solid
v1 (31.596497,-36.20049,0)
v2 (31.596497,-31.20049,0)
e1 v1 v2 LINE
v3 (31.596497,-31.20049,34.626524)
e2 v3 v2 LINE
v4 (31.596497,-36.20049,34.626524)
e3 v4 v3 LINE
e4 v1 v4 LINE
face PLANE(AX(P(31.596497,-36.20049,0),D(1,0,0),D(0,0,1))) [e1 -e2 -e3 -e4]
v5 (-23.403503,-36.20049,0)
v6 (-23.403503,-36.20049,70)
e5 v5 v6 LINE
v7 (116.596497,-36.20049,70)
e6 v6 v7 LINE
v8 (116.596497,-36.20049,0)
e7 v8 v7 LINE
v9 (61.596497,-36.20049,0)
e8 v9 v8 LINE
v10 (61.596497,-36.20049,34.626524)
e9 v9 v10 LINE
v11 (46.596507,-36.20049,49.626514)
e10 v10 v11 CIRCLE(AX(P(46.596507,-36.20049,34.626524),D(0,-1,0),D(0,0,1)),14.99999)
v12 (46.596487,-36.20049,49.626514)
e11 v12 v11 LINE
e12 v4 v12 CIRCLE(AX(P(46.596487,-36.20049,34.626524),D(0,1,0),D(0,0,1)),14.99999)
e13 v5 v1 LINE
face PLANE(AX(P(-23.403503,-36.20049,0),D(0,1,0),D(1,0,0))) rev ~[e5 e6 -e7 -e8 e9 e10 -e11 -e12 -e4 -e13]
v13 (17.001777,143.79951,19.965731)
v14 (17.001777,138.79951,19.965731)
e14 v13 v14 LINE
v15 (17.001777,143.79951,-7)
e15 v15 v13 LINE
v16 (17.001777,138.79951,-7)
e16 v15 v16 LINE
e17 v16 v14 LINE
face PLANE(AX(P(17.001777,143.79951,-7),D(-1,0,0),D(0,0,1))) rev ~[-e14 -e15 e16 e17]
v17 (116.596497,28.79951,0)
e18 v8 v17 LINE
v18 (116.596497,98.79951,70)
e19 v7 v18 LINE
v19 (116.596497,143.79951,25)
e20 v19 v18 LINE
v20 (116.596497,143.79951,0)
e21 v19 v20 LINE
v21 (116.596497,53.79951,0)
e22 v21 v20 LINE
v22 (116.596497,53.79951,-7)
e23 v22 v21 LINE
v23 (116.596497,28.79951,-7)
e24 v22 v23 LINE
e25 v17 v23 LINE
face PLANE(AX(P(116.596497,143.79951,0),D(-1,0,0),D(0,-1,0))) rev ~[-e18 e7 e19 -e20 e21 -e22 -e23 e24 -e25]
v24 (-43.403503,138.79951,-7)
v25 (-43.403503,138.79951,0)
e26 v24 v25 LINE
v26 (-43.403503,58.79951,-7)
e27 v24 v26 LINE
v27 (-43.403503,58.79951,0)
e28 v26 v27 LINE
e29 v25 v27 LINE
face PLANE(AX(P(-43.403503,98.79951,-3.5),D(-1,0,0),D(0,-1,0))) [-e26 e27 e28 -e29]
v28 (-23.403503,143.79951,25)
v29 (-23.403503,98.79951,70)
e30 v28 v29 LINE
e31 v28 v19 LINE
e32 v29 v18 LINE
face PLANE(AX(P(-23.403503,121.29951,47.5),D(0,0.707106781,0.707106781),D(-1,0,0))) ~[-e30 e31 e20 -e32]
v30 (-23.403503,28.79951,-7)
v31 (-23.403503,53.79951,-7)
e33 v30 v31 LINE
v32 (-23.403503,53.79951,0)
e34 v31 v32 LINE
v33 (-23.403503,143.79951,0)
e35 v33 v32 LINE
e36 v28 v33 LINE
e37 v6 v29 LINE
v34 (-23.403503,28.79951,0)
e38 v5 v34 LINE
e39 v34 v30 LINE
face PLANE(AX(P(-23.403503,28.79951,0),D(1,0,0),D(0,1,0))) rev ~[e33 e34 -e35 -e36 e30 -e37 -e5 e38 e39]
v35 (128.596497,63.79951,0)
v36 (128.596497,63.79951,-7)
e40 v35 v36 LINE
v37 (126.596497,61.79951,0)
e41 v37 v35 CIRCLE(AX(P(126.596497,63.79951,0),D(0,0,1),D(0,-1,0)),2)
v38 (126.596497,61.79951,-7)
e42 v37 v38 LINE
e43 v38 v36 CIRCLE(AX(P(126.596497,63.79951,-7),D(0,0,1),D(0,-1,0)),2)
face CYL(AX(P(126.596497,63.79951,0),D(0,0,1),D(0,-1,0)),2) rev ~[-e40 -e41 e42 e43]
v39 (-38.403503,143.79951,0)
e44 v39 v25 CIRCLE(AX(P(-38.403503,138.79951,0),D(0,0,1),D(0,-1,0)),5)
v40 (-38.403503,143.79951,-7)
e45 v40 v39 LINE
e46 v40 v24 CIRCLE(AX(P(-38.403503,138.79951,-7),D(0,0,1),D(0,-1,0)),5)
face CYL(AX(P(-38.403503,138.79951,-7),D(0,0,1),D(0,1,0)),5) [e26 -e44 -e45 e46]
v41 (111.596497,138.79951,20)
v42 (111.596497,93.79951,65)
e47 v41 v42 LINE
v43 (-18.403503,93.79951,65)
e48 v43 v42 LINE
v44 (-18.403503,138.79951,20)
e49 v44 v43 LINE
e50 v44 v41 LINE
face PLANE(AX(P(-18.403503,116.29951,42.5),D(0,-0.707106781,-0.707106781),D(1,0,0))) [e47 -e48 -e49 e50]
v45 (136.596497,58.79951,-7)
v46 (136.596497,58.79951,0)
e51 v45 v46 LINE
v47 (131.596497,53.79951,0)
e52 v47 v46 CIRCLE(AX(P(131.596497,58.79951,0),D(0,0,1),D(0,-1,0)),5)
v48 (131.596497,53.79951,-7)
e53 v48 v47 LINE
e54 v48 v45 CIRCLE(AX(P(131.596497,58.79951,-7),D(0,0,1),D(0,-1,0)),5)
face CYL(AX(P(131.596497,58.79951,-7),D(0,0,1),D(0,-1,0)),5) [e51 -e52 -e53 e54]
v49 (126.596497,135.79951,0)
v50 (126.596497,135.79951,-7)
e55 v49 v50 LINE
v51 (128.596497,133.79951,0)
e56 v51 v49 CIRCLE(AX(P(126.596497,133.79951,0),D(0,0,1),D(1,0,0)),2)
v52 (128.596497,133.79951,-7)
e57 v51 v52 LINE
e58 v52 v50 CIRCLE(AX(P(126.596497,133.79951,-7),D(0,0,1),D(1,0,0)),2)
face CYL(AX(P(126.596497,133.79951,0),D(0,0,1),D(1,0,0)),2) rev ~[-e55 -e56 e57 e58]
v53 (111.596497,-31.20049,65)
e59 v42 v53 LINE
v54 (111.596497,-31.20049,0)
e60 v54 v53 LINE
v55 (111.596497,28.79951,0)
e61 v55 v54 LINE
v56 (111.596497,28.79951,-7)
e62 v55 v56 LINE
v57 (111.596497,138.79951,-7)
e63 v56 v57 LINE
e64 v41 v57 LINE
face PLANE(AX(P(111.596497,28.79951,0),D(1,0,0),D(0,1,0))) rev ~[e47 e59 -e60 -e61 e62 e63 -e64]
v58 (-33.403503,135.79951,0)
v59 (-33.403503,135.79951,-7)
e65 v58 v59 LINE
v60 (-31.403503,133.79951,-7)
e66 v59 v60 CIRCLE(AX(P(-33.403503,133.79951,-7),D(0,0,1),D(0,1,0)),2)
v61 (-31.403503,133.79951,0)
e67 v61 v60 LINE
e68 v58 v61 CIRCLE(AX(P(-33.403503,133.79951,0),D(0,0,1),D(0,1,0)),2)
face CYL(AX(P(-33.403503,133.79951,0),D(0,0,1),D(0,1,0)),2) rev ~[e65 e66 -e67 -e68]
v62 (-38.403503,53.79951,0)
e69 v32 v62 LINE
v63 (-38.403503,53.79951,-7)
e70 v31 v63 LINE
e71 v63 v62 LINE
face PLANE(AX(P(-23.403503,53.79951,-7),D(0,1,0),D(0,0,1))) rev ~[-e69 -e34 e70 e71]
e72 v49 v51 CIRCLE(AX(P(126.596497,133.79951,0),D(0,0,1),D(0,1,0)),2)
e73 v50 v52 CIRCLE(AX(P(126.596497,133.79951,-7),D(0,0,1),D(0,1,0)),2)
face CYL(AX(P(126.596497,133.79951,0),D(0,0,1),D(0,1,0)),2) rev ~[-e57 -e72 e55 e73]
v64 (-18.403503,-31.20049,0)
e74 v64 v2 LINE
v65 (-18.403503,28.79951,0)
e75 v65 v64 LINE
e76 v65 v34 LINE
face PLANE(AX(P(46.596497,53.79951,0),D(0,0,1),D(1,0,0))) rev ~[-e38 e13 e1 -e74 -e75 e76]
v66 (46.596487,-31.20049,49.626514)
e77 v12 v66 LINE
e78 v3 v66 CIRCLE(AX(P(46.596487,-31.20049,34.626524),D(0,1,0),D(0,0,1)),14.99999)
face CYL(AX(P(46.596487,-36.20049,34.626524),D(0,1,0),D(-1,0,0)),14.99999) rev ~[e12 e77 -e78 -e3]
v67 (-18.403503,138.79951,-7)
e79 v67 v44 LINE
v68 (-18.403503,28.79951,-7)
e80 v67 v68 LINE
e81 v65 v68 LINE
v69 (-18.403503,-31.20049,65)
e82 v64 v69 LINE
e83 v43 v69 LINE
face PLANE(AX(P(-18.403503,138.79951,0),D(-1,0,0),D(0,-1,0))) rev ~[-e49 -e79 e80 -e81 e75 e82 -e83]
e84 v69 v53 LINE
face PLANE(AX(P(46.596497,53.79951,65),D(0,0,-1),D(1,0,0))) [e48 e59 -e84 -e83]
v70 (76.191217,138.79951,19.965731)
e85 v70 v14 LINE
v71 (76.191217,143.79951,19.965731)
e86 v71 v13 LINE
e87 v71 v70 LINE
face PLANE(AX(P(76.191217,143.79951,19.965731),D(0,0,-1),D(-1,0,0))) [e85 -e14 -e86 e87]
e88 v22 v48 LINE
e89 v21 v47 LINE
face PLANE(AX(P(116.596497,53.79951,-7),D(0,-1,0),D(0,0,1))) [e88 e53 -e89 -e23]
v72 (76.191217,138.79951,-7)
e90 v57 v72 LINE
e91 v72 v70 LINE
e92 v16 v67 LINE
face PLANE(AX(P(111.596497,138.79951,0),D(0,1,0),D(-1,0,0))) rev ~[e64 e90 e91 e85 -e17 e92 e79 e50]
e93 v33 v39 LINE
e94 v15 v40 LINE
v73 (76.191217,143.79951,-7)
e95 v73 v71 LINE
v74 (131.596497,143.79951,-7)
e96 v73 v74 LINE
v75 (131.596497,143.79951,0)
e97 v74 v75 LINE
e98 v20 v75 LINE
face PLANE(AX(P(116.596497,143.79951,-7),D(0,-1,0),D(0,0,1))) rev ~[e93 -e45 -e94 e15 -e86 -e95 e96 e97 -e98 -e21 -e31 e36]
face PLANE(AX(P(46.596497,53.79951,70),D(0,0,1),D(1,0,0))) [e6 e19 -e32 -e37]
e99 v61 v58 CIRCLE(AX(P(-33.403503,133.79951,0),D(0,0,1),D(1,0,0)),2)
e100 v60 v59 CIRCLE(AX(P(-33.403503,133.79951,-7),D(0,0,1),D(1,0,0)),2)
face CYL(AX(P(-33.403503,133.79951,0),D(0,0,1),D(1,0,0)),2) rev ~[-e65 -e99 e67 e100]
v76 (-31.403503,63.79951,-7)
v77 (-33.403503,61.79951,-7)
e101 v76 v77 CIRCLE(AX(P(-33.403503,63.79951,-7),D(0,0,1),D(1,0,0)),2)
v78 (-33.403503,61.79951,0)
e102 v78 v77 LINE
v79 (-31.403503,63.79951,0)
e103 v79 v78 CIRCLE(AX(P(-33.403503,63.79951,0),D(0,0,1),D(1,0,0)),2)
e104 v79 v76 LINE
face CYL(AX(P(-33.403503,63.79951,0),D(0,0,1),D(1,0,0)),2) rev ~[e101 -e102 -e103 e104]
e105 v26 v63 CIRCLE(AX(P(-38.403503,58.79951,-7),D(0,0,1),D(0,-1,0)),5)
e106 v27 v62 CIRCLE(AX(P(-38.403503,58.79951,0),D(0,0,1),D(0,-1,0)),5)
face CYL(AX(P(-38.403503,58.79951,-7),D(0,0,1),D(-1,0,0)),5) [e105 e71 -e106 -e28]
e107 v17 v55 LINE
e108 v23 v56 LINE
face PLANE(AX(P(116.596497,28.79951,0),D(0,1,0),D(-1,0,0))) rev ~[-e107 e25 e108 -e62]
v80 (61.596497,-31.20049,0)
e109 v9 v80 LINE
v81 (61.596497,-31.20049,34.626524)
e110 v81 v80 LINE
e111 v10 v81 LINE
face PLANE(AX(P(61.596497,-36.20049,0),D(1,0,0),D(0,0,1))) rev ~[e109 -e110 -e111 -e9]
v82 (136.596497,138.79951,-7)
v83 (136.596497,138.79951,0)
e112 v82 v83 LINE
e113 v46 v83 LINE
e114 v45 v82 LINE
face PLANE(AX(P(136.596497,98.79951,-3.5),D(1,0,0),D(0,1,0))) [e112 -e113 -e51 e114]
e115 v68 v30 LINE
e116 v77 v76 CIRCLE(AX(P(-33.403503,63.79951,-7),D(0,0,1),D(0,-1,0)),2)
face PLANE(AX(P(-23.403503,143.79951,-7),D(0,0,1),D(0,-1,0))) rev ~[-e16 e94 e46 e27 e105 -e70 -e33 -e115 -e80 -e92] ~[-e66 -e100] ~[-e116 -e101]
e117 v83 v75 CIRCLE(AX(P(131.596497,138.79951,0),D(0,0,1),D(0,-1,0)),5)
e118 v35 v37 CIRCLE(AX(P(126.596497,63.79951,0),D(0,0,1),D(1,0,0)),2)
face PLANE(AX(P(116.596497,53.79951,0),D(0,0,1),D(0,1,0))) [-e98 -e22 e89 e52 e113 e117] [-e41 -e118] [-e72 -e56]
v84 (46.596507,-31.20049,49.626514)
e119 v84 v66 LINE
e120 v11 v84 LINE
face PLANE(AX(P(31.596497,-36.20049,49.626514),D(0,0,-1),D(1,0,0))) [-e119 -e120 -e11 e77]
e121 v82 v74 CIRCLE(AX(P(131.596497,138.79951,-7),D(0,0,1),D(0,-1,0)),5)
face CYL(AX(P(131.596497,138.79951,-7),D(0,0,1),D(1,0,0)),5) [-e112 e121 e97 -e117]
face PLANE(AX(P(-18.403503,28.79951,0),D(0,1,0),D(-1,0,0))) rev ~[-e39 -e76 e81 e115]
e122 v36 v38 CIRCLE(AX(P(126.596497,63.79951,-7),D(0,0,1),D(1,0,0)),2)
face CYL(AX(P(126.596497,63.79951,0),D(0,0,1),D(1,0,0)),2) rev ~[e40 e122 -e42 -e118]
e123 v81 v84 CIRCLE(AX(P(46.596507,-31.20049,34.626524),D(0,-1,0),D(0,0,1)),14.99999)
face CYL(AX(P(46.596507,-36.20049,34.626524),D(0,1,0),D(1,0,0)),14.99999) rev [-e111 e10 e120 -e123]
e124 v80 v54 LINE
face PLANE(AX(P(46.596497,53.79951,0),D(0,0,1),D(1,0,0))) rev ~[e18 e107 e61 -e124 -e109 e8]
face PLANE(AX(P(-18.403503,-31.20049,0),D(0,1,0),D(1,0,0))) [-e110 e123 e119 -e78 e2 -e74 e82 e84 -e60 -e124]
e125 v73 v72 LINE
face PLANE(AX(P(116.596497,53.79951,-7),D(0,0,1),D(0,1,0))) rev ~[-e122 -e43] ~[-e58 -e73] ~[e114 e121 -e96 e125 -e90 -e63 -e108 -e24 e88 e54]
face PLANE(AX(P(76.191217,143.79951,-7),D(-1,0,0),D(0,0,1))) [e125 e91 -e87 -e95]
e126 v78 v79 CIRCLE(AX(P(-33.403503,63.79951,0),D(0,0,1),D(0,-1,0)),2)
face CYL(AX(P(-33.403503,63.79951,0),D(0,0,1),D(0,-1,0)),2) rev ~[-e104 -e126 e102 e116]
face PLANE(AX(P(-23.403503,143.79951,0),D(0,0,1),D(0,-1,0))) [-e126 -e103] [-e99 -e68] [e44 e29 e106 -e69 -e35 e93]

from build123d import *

# Parameters (mm, degrees)
F0_W      = 140
F0_H      = 180
F1_DEPTH  = 70
F2_W      = 130
F2_H      = 170
F3_DEPTH  = 65
F4_SIZE   = 45
F5_W      = 30
F5_H      = 49.6265143156
F6_DEPTH  = 25
F7_R      = 14.99999
F9_DEPTH  = 7
F10_W     = 59.1894394159
F10_H     = 26.9657306075
F11_DEPTH = 25
F12_W     = 90
F12_H     = 7
F13_DEPTH = 20
F14_W     = 90
F14_H     = 7
F15_DEPTH = 20
F17_DEPTH = 25
F19_DEPTH = 25
F20_R     = 5


# Not quite as in the source:
# - a fillet or chamfer is up to 0.001 mm smaller than in the source, because OpenCascade refuses the exact size


with BuildPart() as f1:
    # F0 (on Top) → F1 (new body)
    with BuildSketch(Plane.XY):
        with Locations((46.5964969993, 53.7995101511)):
            Rectangle(F0_W, F0_H)
    extrude(amount=F1_DEPTH)

    # F2 (on face) → F3 (cut)
    with BuildSketch(Plane(origin=(0, 0, 0), x_dir=(1, 0, 0), z_dir=(0, 0, -1))):
        with Locations((46.5964969993, -53.7995101511)):
            Rectangle(F2_W, F2_H)
    extrude(amount=-F3_DEPTH, mode=Mode.SUBTRACT)

    # F4
    f4_edges = [f1.edges().sort_by_distance(p)[0] for p in [
        (46.596497, 143.79951, 70),
        (46.596497, 138.79951, 65),
    ]]
    chamfer(f4_edges, length=F4_SIZE)

    # F5 (on face) → F6 (cut)
    with BuildSketch(Plane.XZ.offset(36.2004898489)):
        with Locations((46.5964969993, 24.8132571578)):
            Rectangle(F5_W, F5_H)
    extrude(amount=-F6_DEPTH, mode=Mode.SUBTRACT)

    # F7 (radius 15 in the source; OpenCascade refuses exactly that, so slightly less here)
    f7_edges = [f1.edges().sort_by_distance(p)[0] for p in [
        (61.596497, -33.70049, 49.626514),
        (31.596497, -33.70049, 49.626514),
    ]]
    fillet(f7_edges, radius=F7_R)

    # F8 (on face) → F9 (join)
    with BuildSketch(Plane(origin=(0, 0, 0), x_dir=(1, 0, 0), z_dir=(0, 0, -1))):
        Polygon((-23.4035030007, -28.7995101511), (-23.4035030007, -143.7995101511), (116.5964969993, -143.7995101511), (116.5964969993, -28.7995101511), (111.5964969993, -28.7995101511), (111.5964969993, -138.7995101511), (-18.4035030007, -138.7995101511), (-18.4035030007, -28.7995101511), align=None)
    extrude(amount=F9_DEPTH)

    # F10 (on face) → F11 (cut)
    with BuildSketch(Plane(origin=(0, 143.7995101511, 0), x_dir=(-1, 0, 0), z_dir=(0, 1, 0))):
        with Locations((-46.5964969993, 6.4828653038)):
            Rectangle(F10_W, F10_H)
    extrude(amount=-F11_DEPTH, mode=Mode.SUBTRACT)

    # F12 (on face) → F13 (join)
    with BuildSketch(Plane(origin=(-23.4035030007, 0, 0), x_dir=(0, -1, 0), z_dir=(-1, 0, 0))):
        with Locations((-98.7995101511, -3.5)):
            Rectangle(F12_W, F12_H)
    extrude(amount=F13_DEPTH)

    # F14 (on face) → F15 (join)
    with BuildSketch(Plane.YZ.offset(116.5964969993)):
        with Locations((98.7995101511, -3.5)):
            Rectangle(F14_W, F14_H)
    extrude(amount=F15_DEPTH)

    # F16 (on face) → F17 (cut)
    with BuildSketch(Plane.XY):
        with BuildLine():
            ThreePointArc((-33.4035030007, 135.7995101511), (-34.8177165631, 132.3852965888), (-31.4035030007, 133.7995101511))
            ThreePointArc((-31.4035030007, 133.7995101511), (-31.9892894384, 135.2137237135), (-33.4035030007, 135.7995101511))
        make_face()
        with BuildLine():
            ThreePointArc((-33.4035030007, 61.7995101511), (-31.9892894384, 62.3852965888), (-31.4035030007, 63.7995101511))
            ThreePointArc((-31.4035030007, 63.7995101511), (-34.8177165631, 65.2137237135), (-33.4035030007, 61.7995101511))
        make_face()
    extrude(amount=-F17_DEPTH, mode=Mode.SUBTRACT)

    # F18 (on face) → F19 (cut)
    with BuildSketch(Plane.XY):
        with BuildLine():
            ThreePointArc((126.5964969993, 61.7995101511), (128.0107105616, 62.3852965888), (128.5964969993, 63.7995101511))
            ThreePointArc((128.5964969993, 63.7995101511), (125.1822834369, 65.2137237135), (126.5964969993, 61.7995101511))
        make_face()
        with BuildLine():
            ThreePointArc((126.5964969993, 135.7995101511), (125.1822834369, 132.3852965888), (128.5964969993, 133.7995101511))
            ThreePointArc((128.5964969993, 133.7995101511), (128.0107105616, 135.2137237135), (126.5964969993, 135.7995101511))
        make_face()
    extrude(amount=-F19_DEPTH, mode=Mode.SUBTRACT)

    # F20
    f20_edges = [f1.edges().sort_by_distance(p)[0] for p in [
        (-43.403503, 53.79951, -3.5),
        (-43.403503, 143.79951, -3.5),
        (136.596497, 143.79951, -3.5),
        (136.596497, 53.79951, -3.5),
    ]]
    fillet(f20_edges, radius=F20_R)


solid = f1.part
